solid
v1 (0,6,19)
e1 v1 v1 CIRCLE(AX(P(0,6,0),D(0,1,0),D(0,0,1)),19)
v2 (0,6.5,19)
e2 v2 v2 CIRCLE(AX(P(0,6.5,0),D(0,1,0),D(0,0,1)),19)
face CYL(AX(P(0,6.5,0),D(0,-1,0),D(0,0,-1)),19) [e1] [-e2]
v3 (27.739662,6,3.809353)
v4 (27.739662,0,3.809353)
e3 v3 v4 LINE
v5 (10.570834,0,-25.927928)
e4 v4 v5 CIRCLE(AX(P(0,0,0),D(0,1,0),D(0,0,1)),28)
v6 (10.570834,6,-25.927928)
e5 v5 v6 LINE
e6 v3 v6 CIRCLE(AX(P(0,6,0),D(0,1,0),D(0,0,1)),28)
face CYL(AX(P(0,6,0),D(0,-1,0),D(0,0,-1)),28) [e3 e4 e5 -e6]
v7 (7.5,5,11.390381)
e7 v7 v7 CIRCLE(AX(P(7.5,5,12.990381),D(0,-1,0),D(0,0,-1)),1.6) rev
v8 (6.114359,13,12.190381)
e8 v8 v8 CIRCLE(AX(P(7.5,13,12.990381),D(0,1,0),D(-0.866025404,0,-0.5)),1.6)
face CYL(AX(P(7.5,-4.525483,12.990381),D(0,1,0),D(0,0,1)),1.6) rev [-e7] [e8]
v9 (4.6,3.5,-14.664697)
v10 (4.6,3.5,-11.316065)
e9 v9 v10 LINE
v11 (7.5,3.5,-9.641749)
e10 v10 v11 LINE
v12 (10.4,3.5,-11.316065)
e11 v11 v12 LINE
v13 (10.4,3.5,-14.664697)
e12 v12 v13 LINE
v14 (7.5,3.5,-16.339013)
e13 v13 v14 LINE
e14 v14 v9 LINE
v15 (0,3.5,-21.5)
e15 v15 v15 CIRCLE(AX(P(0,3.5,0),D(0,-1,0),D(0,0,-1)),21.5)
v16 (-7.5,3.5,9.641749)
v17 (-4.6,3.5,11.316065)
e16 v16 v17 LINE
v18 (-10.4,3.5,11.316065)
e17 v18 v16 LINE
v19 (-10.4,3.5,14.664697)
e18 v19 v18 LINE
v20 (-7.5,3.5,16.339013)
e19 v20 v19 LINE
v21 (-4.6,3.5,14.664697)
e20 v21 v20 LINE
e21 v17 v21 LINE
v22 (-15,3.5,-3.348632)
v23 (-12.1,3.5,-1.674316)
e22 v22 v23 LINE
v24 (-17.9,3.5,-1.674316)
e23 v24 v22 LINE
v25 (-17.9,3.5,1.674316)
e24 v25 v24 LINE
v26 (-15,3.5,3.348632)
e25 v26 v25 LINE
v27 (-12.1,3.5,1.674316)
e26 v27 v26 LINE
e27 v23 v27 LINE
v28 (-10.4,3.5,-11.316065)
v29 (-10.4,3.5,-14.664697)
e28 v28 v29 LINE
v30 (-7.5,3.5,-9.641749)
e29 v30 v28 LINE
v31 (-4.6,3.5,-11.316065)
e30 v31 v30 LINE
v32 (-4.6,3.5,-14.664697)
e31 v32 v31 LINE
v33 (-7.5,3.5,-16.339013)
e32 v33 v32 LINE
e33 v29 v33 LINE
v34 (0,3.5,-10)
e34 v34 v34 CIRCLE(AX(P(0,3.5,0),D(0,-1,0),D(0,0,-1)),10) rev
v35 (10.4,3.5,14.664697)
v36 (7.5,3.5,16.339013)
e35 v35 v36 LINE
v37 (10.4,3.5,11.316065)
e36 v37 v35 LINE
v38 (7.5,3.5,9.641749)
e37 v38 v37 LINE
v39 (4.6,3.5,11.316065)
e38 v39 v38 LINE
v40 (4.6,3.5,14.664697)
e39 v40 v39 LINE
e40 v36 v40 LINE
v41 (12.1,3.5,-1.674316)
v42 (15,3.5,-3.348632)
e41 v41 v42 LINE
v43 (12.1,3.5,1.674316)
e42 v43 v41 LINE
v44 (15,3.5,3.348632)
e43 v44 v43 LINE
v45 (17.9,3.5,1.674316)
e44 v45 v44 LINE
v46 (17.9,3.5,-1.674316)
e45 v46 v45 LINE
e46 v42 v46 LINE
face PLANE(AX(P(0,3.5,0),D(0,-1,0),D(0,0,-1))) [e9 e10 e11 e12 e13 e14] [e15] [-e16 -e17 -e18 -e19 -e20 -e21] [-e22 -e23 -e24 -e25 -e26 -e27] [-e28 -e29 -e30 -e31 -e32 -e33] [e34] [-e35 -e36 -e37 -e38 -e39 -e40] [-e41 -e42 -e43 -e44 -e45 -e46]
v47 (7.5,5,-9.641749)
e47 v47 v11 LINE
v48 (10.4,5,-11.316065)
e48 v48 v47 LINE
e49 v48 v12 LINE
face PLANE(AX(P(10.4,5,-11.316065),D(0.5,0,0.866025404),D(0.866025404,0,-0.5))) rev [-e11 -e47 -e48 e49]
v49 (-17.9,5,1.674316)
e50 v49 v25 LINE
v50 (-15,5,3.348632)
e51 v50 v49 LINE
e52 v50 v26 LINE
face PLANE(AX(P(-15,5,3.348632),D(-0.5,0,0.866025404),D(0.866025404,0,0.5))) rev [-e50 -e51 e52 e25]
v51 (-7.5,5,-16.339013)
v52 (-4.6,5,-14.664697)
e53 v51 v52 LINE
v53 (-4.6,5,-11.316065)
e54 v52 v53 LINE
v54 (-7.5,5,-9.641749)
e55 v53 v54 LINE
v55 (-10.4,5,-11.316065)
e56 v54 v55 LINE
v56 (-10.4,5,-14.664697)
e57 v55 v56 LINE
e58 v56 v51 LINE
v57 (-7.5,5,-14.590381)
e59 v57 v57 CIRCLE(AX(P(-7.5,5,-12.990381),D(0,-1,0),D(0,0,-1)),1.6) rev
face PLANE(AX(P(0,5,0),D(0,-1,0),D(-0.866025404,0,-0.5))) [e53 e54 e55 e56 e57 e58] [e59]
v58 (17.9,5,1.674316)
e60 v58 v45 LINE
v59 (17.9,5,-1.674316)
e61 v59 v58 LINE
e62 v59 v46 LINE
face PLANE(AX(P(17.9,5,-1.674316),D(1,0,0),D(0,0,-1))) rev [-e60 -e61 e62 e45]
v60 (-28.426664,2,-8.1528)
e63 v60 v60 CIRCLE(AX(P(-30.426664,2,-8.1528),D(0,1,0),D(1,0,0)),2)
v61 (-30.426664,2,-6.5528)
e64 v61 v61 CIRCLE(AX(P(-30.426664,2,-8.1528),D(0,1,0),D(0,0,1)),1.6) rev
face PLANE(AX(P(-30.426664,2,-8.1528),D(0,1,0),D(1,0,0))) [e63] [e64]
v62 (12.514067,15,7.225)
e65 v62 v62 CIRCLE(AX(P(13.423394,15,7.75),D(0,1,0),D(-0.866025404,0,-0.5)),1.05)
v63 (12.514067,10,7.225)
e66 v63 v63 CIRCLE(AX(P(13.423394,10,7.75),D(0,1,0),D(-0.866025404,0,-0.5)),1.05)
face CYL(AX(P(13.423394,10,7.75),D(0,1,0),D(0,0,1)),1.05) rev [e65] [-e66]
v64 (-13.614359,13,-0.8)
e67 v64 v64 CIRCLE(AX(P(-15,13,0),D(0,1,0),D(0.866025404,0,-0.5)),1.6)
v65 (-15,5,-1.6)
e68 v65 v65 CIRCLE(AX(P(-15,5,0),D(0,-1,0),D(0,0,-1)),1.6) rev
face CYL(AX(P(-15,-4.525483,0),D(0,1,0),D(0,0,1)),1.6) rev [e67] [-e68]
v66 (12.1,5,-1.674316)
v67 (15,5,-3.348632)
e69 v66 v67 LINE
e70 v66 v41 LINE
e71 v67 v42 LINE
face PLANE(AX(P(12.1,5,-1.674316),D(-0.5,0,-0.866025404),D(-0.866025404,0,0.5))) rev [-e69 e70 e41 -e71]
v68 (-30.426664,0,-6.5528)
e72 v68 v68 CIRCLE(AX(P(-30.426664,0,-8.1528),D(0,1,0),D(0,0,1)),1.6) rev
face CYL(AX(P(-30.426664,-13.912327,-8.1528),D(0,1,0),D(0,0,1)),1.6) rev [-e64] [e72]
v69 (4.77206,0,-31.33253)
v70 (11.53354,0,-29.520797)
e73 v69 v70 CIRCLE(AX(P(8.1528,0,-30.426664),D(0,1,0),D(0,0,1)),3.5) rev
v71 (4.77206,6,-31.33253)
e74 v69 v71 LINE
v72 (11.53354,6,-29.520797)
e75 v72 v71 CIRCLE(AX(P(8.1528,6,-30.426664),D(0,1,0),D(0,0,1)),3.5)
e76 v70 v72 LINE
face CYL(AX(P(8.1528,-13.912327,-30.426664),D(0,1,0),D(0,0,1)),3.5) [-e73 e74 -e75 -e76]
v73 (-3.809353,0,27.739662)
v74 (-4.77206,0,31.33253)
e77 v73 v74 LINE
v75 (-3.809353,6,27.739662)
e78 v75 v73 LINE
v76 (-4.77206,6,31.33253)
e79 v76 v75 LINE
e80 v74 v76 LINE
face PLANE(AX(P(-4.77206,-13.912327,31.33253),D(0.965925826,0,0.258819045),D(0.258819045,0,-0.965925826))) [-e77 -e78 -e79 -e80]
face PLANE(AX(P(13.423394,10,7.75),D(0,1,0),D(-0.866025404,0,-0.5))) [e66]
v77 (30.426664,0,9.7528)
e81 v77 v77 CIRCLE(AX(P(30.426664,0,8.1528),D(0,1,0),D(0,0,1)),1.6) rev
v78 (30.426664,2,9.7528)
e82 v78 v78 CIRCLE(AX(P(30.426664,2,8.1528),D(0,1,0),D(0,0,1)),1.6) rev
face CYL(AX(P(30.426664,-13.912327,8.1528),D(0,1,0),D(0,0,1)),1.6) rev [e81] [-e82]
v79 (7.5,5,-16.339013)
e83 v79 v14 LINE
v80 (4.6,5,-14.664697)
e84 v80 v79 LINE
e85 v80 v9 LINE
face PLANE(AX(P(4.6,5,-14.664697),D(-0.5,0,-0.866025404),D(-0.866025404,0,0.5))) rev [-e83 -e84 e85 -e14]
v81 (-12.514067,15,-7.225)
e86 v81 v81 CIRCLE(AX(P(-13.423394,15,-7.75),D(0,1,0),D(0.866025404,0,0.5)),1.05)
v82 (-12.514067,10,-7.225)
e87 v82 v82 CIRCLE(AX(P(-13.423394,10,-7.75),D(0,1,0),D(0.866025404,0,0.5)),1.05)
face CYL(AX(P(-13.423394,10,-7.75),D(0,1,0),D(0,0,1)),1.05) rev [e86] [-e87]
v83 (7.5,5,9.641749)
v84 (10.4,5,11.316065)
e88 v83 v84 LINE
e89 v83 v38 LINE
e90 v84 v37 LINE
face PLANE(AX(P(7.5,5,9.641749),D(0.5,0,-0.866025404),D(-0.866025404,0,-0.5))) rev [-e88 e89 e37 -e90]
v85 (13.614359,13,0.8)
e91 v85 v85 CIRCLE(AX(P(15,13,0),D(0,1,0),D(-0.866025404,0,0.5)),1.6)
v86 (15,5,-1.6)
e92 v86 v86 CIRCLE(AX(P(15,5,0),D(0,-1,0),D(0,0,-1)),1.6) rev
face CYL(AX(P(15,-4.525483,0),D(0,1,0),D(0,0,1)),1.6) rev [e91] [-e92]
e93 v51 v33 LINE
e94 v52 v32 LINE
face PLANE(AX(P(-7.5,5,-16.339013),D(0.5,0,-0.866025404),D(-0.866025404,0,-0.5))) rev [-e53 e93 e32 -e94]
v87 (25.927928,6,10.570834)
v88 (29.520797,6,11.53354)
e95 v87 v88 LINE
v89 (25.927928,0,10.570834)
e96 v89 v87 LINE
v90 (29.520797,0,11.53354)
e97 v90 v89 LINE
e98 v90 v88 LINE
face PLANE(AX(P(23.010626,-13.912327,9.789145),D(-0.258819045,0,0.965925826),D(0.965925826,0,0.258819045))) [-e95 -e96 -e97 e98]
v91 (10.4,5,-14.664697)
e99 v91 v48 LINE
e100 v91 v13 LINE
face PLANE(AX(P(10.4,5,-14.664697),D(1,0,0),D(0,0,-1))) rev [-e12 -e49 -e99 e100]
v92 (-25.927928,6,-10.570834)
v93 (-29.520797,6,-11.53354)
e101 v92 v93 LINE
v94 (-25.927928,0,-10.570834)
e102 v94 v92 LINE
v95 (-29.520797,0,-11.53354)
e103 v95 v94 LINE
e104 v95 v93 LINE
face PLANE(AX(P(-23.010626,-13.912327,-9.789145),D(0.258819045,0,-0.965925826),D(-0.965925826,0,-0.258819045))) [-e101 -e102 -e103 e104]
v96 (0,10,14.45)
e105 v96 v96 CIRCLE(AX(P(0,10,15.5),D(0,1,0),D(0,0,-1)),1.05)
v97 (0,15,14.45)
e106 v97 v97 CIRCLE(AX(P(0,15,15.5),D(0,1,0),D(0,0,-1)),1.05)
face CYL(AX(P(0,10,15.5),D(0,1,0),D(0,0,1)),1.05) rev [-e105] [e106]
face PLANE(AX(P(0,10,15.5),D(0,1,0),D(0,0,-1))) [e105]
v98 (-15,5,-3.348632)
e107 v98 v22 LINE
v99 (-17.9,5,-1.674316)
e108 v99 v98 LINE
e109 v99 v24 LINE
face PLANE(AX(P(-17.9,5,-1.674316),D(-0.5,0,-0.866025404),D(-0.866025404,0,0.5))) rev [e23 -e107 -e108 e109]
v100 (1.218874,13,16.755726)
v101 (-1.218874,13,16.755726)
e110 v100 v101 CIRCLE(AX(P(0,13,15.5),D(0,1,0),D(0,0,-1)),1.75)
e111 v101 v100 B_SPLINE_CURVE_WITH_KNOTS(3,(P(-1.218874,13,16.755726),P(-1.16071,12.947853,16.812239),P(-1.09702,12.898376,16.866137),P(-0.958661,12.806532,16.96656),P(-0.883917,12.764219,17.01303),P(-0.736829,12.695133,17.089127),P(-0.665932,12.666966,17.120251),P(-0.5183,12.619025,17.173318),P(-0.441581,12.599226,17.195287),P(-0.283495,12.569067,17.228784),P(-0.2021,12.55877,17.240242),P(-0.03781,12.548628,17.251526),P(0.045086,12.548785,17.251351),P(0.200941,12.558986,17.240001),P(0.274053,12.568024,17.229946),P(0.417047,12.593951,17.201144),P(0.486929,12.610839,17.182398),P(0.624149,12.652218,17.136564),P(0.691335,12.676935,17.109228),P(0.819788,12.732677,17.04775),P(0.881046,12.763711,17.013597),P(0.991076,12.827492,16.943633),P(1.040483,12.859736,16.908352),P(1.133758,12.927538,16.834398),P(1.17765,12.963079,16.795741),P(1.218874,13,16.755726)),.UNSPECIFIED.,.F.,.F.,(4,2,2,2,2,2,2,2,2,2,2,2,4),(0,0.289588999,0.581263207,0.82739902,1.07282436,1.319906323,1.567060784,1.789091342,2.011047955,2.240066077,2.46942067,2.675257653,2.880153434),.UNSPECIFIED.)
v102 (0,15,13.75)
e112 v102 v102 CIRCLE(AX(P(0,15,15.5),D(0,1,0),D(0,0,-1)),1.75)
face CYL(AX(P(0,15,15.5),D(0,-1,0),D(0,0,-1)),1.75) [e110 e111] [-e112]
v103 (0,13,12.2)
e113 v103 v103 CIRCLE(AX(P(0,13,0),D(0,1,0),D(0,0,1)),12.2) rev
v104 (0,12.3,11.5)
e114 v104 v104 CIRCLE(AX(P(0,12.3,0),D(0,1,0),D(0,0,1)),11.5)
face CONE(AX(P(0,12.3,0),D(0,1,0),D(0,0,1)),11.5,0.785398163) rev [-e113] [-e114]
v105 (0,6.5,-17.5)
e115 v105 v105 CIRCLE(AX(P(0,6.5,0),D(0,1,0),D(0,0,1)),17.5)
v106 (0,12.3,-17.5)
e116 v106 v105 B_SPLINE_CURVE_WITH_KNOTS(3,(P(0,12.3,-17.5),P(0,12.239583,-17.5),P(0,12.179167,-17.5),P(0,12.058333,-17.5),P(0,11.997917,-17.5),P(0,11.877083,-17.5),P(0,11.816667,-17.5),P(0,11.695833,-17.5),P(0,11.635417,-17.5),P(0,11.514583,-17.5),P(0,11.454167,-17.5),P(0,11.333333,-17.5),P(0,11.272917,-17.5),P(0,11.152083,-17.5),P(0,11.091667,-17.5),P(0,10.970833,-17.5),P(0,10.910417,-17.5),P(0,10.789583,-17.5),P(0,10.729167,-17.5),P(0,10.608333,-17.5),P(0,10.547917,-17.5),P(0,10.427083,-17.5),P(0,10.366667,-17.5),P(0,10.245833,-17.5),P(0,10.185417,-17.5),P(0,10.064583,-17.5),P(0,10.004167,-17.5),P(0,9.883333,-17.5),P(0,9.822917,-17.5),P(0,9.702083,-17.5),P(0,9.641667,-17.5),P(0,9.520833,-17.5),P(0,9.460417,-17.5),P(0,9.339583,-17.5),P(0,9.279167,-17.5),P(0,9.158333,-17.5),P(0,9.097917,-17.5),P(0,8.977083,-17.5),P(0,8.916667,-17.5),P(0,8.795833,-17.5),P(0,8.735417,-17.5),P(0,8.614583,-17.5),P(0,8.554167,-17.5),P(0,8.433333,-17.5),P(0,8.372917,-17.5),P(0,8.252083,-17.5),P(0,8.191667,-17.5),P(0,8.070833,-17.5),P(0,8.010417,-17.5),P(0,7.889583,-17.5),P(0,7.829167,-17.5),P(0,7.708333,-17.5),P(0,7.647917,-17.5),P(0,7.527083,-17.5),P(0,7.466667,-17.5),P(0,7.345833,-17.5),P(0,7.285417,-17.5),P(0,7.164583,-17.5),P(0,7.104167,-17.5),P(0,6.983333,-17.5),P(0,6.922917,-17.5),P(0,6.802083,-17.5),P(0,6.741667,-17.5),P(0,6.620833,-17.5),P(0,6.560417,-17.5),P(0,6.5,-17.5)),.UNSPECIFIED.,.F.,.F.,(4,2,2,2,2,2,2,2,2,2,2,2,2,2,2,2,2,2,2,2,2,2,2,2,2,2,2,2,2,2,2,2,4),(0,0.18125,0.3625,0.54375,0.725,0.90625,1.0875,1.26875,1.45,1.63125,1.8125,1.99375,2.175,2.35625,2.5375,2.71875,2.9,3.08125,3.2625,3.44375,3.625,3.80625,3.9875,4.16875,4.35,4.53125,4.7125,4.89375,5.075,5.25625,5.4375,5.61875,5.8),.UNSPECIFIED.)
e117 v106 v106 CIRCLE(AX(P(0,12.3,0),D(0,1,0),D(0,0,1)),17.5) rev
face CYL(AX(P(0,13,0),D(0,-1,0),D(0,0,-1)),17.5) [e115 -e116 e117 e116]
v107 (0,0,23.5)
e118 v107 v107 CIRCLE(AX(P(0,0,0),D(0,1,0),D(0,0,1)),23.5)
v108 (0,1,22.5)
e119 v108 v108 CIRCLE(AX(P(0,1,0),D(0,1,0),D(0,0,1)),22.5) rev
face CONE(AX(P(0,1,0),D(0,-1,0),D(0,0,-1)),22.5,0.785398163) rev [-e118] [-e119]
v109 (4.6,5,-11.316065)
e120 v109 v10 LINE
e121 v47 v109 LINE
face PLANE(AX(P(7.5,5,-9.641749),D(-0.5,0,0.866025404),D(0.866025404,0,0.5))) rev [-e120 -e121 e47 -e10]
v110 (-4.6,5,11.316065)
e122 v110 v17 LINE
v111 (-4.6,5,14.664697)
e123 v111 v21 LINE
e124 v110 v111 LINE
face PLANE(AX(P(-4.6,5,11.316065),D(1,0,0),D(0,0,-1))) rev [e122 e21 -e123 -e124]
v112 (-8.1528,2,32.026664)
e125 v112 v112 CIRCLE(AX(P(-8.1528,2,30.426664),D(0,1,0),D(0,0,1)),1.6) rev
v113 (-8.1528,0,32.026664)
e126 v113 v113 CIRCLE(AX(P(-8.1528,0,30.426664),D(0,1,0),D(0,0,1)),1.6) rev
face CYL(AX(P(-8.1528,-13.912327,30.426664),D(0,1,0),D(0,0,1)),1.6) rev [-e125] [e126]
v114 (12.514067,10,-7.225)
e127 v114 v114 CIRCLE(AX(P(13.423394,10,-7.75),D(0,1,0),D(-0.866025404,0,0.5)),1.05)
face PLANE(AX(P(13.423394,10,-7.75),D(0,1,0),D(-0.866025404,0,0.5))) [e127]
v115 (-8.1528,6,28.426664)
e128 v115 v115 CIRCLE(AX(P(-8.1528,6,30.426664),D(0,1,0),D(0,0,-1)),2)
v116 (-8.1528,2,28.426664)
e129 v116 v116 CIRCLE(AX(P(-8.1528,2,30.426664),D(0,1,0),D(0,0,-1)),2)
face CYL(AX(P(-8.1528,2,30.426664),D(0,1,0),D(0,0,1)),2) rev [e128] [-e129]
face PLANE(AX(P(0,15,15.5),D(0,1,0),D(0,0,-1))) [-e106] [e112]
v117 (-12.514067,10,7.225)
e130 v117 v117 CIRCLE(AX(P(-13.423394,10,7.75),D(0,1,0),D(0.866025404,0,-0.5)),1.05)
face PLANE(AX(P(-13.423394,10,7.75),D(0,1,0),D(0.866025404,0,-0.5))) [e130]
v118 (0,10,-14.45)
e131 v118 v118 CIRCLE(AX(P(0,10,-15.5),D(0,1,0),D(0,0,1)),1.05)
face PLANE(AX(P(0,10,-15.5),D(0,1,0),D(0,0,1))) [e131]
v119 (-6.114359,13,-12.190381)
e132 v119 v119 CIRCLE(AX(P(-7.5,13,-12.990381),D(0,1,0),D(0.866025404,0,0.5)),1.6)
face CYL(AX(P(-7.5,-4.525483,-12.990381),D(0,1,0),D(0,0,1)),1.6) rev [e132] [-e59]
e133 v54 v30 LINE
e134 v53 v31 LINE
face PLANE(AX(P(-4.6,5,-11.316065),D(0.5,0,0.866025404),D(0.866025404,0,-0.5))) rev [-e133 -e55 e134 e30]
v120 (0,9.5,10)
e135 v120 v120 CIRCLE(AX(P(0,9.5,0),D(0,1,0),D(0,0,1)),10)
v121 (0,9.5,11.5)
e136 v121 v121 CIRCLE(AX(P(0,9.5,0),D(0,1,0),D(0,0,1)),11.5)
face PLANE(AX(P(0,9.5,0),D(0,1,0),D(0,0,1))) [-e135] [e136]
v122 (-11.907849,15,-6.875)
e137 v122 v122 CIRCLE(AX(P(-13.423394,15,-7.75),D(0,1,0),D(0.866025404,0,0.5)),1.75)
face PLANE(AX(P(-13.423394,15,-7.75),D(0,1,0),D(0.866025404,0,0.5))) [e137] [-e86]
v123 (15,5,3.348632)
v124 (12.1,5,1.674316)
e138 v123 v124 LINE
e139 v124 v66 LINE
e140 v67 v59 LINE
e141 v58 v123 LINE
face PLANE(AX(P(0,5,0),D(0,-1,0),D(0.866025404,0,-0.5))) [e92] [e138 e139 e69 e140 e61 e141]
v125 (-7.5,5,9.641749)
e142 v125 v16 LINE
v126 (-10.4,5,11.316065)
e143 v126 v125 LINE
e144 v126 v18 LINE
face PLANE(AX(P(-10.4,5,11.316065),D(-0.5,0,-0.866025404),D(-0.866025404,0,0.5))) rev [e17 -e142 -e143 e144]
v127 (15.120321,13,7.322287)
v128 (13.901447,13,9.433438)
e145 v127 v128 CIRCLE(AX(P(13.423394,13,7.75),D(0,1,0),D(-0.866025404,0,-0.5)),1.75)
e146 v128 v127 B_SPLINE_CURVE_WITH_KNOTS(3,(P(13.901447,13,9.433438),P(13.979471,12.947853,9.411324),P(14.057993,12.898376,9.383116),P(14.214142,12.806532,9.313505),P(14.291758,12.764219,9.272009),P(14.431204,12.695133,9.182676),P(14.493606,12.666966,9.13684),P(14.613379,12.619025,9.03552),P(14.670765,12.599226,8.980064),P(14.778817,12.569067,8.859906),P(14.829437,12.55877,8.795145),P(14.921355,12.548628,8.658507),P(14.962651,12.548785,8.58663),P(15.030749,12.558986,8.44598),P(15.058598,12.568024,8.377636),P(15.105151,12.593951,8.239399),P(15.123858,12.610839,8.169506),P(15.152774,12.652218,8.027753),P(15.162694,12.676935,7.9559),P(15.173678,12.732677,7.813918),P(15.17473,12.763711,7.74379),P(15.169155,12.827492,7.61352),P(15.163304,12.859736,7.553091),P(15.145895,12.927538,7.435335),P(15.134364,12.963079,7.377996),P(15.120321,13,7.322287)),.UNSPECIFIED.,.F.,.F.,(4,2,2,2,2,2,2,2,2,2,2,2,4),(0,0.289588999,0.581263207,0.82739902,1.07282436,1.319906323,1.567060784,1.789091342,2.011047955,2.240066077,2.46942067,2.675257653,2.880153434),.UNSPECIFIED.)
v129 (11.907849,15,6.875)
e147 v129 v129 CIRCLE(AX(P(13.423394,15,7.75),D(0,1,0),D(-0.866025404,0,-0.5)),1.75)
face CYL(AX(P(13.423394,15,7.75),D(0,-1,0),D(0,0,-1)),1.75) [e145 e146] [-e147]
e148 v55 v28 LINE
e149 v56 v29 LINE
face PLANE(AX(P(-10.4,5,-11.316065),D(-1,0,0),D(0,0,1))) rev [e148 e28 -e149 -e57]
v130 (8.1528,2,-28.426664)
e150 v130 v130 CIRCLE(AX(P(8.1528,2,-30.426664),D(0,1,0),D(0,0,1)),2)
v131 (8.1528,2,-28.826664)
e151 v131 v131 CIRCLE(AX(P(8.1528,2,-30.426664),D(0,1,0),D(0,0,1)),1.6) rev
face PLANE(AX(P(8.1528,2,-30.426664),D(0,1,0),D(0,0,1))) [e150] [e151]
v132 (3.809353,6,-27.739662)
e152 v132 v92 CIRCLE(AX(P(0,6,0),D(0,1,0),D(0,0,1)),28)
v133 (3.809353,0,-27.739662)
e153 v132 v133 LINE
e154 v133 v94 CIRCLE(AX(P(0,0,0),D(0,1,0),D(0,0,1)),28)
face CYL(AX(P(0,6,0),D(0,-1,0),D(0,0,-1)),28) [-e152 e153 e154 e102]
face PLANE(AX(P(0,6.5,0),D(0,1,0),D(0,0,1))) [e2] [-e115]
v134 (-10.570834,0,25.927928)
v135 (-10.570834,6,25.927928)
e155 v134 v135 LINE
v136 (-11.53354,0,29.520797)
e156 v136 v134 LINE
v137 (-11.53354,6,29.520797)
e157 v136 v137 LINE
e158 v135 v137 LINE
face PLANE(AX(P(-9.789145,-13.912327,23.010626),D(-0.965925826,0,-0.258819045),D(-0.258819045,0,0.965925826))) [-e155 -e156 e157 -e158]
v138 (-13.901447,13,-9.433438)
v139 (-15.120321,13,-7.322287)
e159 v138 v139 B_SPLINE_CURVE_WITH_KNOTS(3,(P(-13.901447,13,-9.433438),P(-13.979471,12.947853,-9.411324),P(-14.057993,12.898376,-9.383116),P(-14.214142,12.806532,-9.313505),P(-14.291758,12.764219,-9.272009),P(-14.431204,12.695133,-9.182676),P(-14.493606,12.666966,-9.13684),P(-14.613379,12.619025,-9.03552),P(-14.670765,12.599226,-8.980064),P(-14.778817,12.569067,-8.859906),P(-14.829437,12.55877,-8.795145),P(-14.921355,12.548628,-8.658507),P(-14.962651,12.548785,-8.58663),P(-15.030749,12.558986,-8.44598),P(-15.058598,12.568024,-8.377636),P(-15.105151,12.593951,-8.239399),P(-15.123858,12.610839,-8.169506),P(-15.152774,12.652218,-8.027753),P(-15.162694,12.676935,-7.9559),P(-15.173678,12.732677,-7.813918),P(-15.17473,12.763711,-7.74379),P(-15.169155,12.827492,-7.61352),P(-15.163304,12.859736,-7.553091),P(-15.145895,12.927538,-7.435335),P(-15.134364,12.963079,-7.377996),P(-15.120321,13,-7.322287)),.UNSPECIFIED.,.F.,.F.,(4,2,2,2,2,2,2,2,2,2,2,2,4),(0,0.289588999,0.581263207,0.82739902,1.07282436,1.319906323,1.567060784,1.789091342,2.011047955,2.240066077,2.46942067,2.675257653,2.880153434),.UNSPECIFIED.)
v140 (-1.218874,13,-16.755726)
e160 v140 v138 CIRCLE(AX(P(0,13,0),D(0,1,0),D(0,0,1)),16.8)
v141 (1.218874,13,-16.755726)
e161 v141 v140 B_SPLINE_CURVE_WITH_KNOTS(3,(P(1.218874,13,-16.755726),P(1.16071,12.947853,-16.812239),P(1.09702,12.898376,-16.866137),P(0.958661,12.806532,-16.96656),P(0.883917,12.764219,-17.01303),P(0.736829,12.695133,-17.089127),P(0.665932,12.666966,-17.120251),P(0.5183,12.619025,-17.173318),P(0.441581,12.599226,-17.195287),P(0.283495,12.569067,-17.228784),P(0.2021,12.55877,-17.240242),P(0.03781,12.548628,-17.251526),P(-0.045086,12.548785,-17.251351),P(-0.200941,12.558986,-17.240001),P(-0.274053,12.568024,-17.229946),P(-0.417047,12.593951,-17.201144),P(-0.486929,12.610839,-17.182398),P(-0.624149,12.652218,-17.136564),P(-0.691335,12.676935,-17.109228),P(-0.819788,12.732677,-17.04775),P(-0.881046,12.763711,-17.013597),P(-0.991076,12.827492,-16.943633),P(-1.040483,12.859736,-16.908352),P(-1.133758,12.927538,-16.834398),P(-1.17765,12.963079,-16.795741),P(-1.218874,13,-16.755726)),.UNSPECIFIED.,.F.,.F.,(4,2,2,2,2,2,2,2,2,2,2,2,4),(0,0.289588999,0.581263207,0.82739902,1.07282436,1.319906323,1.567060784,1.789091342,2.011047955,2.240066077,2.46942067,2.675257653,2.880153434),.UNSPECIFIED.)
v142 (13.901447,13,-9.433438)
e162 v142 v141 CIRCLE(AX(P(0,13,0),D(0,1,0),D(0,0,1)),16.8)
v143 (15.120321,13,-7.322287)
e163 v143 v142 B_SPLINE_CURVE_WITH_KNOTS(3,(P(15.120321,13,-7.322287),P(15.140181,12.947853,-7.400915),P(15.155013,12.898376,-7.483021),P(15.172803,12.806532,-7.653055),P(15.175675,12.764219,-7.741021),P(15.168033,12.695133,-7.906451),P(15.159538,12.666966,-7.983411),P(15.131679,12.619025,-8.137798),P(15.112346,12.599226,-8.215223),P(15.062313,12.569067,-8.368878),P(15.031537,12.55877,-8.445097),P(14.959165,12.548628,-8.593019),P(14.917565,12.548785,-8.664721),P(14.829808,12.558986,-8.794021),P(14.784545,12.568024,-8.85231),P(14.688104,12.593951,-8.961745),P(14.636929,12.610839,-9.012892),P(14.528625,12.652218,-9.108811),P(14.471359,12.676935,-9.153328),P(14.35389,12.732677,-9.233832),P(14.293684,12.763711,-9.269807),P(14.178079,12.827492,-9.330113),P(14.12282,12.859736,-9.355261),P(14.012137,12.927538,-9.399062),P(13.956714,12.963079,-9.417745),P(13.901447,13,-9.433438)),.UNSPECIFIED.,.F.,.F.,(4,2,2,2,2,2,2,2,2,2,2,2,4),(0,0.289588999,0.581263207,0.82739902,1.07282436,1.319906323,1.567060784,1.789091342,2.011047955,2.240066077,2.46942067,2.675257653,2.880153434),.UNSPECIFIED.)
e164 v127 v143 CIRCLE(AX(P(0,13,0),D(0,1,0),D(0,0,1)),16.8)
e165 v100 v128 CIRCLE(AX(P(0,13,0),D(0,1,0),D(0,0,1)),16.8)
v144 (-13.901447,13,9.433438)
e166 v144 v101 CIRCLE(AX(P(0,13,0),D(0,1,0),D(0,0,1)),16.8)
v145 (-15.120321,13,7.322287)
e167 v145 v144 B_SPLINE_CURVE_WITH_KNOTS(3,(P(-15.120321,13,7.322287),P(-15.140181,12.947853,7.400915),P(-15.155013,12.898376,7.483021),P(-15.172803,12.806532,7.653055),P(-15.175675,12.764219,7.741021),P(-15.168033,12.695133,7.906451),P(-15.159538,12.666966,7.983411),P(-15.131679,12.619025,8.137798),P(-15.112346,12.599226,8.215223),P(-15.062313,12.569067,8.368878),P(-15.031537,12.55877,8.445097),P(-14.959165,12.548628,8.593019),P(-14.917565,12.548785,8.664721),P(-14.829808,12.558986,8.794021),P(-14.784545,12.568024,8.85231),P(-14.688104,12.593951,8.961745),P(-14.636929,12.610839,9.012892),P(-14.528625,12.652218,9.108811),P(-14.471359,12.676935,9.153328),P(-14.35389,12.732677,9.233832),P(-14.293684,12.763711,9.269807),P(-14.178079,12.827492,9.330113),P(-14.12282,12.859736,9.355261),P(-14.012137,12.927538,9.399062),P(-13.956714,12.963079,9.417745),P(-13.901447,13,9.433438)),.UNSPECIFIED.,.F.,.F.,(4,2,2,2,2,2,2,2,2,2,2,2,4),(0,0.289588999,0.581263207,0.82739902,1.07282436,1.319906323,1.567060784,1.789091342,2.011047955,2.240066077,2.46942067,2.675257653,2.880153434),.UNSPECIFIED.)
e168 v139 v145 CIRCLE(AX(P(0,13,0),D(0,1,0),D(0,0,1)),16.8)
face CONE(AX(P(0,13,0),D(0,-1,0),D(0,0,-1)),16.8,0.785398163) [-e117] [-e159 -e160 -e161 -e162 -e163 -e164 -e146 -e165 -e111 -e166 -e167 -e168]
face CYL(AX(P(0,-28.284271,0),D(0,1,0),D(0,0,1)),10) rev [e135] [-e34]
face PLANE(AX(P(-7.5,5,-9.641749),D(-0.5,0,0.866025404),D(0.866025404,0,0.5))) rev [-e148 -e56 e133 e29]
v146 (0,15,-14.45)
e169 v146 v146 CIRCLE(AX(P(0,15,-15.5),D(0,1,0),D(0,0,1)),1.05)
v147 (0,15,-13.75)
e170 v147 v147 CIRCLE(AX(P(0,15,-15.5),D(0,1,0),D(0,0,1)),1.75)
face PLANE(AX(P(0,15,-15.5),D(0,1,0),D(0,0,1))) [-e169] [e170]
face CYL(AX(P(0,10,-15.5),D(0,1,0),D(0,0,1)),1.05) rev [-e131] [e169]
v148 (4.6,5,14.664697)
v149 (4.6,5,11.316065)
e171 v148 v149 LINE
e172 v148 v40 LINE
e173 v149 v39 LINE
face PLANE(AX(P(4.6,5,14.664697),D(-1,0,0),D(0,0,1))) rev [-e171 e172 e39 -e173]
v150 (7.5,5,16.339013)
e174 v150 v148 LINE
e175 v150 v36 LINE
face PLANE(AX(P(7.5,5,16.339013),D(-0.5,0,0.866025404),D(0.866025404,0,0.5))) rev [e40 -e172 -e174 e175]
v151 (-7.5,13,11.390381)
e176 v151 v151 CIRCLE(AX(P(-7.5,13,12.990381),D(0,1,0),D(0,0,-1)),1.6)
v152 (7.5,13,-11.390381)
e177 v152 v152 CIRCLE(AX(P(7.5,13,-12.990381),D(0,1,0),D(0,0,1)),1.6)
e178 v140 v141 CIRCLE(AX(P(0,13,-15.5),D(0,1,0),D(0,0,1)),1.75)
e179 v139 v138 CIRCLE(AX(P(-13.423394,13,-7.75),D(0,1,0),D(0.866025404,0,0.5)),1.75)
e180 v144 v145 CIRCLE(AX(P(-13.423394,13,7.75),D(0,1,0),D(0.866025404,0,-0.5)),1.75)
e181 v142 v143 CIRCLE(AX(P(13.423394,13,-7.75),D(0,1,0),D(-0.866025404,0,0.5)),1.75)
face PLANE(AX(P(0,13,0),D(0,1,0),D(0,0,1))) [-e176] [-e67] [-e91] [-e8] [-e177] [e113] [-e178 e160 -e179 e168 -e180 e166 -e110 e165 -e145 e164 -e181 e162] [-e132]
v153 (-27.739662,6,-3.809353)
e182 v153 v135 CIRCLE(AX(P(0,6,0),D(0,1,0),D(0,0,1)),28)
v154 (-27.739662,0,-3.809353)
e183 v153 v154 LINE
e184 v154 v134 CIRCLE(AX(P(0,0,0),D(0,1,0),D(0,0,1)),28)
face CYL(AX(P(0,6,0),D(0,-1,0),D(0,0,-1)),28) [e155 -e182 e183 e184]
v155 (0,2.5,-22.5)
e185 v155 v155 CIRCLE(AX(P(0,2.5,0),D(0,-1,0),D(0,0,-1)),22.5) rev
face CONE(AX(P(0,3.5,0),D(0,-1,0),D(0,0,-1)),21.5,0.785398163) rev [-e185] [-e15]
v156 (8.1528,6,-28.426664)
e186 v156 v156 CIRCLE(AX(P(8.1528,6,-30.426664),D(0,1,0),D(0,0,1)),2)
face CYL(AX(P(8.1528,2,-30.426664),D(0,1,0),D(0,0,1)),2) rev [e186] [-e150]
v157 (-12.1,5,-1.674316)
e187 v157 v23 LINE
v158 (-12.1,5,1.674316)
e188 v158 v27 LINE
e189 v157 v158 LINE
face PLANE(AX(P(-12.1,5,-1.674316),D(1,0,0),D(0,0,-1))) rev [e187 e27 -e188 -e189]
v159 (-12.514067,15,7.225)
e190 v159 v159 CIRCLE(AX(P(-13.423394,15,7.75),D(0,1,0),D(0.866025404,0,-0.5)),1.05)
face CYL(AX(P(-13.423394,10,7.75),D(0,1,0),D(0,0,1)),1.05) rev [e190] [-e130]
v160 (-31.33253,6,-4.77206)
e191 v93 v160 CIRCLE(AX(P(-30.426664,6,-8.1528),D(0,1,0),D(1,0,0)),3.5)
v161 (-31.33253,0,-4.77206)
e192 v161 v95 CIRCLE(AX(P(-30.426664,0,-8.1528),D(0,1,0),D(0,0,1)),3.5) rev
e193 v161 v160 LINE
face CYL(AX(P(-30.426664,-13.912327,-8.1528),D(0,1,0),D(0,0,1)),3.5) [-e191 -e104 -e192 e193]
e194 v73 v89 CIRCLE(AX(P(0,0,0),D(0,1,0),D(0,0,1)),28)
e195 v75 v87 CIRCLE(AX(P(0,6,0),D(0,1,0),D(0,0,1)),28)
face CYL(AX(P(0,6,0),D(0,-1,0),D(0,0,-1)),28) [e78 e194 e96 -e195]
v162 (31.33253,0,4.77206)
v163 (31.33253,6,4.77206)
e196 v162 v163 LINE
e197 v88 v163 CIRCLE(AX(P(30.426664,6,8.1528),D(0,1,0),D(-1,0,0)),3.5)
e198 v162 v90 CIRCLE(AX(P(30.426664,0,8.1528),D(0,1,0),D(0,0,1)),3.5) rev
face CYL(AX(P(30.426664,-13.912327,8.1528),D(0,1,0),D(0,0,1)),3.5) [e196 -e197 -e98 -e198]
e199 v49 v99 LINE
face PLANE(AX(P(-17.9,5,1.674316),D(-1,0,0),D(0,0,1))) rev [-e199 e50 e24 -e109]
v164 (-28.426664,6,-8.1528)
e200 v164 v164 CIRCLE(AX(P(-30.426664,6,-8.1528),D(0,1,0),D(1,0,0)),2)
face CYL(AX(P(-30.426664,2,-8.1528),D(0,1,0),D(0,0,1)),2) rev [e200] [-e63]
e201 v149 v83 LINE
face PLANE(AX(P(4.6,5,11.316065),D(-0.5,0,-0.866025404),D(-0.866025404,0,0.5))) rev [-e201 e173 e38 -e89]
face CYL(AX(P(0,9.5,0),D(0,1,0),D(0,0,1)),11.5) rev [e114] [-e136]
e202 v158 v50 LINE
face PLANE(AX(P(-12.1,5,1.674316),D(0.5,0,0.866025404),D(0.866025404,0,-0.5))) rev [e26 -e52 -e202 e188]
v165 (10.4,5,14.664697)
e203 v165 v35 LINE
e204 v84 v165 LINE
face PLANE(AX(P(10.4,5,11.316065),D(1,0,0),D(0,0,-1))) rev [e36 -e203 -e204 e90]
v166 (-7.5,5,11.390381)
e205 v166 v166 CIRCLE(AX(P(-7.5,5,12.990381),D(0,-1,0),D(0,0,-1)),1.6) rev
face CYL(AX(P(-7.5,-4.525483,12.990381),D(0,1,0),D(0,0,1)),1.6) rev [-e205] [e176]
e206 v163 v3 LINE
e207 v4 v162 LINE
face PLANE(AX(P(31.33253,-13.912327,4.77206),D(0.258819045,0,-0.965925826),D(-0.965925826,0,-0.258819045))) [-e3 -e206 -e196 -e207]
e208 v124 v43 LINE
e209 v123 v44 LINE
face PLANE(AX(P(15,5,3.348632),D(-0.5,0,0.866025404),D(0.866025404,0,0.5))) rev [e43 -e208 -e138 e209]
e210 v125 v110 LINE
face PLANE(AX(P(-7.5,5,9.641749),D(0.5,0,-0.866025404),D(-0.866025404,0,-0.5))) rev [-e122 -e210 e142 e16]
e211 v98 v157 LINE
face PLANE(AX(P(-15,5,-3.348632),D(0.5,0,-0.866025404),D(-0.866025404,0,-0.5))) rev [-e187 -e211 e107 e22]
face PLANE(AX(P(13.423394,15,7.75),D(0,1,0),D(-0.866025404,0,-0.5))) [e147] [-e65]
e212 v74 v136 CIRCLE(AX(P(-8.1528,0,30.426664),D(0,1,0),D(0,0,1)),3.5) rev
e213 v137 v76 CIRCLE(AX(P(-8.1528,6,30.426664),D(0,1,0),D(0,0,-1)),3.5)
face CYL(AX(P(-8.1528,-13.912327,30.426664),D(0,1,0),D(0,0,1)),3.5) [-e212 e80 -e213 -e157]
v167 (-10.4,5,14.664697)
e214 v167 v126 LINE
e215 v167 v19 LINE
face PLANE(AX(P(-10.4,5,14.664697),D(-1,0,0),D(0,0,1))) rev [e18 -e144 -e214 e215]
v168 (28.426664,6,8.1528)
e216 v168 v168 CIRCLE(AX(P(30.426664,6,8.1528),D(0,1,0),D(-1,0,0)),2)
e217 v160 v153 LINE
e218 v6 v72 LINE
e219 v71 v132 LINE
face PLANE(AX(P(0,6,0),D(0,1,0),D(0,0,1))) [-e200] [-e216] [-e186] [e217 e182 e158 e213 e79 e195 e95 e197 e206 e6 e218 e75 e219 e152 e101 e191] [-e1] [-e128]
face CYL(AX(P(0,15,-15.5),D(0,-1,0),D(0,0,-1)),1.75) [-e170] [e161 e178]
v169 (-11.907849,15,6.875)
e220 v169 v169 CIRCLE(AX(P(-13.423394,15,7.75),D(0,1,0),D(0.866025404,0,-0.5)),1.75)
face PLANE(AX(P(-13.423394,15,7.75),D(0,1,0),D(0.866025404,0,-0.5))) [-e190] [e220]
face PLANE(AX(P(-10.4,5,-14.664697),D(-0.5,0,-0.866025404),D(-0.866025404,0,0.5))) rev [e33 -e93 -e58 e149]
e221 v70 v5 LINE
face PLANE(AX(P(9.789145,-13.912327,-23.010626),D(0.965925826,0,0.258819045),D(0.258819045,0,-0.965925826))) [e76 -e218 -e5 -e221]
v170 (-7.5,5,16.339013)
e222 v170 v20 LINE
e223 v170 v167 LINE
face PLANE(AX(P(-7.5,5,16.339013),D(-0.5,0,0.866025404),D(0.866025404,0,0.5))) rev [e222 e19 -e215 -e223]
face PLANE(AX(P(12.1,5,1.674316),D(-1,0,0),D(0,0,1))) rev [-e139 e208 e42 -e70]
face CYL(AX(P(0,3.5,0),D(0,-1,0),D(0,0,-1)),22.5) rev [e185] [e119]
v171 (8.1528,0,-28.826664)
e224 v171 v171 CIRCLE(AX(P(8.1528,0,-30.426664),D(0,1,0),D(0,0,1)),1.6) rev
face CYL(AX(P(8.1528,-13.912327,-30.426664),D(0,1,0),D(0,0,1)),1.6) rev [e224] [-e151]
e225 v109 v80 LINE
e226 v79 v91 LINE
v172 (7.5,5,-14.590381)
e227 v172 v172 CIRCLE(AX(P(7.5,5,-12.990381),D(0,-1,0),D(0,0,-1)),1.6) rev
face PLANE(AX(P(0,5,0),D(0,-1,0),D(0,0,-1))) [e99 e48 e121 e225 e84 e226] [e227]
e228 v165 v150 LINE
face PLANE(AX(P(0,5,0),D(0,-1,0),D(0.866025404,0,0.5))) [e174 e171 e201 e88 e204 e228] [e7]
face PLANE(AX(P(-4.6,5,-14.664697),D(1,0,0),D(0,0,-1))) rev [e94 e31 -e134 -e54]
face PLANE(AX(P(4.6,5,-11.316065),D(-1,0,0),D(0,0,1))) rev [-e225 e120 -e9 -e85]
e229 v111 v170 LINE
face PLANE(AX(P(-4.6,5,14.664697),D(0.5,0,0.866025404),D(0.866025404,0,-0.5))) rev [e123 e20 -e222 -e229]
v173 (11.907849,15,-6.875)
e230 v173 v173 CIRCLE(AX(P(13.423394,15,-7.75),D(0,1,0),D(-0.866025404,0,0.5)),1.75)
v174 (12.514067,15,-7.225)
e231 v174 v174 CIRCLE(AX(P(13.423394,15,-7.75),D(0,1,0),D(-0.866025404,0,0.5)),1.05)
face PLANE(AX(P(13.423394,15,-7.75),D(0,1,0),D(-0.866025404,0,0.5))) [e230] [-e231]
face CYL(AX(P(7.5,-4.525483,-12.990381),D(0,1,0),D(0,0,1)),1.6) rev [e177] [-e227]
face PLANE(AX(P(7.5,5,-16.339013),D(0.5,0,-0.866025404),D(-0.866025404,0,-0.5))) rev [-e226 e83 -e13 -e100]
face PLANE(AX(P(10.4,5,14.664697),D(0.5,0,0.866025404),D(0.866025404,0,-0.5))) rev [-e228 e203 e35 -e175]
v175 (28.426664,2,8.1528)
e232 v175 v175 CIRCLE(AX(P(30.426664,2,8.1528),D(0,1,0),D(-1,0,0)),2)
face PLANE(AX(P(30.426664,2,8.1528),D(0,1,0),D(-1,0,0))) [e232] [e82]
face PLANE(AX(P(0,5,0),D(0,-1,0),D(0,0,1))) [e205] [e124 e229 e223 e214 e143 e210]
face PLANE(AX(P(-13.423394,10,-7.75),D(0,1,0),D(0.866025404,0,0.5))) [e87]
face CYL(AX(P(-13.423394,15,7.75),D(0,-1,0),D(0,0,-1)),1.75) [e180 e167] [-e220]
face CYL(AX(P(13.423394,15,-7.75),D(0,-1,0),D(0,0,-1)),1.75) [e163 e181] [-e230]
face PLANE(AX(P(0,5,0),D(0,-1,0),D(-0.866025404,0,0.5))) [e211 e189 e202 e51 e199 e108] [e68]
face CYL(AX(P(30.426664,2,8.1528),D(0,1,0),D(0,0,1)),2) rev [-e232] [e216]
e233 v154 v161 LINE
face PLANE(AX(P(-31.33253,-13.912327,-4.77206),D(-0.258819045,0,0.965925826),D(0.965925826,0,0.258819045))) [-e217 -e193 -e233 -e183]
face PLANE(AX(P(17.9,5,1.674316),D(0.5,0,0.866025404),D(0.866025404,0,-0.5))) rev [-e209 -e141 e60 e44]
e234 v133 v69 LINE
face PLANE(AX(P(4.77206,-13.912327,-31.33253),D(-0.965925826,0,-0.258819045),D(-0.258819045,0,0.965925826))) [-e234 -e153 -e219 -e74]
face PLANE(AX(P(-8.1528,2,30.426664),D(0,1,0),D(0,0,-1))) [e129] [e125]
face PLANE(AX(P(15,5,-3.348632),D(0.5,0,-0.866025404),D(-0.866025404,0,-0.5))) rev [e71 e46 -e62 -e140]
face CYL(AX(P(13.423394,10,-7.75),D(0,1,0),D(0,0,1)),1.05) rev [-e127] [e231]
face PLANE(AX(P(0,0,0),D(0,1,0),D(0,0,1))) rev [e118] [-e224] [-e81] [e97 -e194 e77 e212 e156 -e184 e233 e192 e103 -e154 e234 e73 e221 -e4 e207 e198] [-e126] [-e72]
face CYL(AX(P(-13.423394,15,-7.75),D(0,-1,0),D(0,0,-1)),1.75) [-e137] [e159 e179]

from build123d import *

# Parameters (mm, degrees)
SKETCH1_R           = 28
BOSS_EXTRUDE1_DEPTH = 6
SKETCH2_R           = 19
BOSS_EXTRUDE2_DEPTH = 0.5
SKETCH3_R           = 17.5
BOSS_EXTRUDE3_DEPTH = 6.5
SKETCH4_R           = 1.05
CUT_EXTRUDE1_DEPTH  = 3
CIRPATTERN1_COUNT   = 6
SKETCH5_R           = 11.5
CUT_EXTRUDE2_DEPTH  = 3.5
SKETCH6_R           = 10
CUT_EXTRUDE3_DEPTH  = 9.5
SKETCH7_R           = 1.6
CUT_EXTRUDE4_DEPTH  = 13
CUT_EXTRUDE10_DEPTH = 5
CHAMFER1_SIZE       = 1
SKETCH13_R          = 1.6
BOSS_EXTRUDE4_DEPTH = 6
SKETCH14_R          = 2
CUT_EXTRUDE12_DEPTH = 4
CIRPATTERN3_COUNT   = 4
SKETCH15_R          = 22.5
CUT_EXTRUDE13_DEPTH = 3.5
BOSS_EXTRUDE5_START = 2
SKETCH16_R          = 1.75
SKETCH16_R_2        = 1.05
BOSS_EXTRUDE5_DEPTH = 2
CIRPATTERN4_COUNT   = 6
CHAMFER2_SIZE       = 0.7
CHAMFER3_SIZE       = 0.7
CHAMFER4_SIZE       = 1
CIRPATTERN5_COUNT   = 6


with BuildPart() as part:
    # Sketch1 → Boss-Extrude1 (new body)
    with BuildSketch(Plane(origin=(0, 0, 0), x_dir=(1, 0, 0), z_dir=(0, 1, 0))):
        with Locations(Location((0, 0, 0), (0, 0, 270))):
            Circle(SKETCH1_R)
    extrude(amount=BOSS_EXTRUDE1_DEPTH)

    # Sketch2 → Boss-Extrude2 (add)
    with BuildSketch(Plane(origin=(0, 6, 0), x_dir=(1, 0, 0), z_dir=(0, 1, 0))):
        with Locations(Location((0, 0, 0), (0, 0, 270))):
            Circle(SKETCH2_R)
    extrude(amount=BOSS_EXTRUDE2_DEPTH)

    # Sketch3 → Boss-Extrude3 (add)
    with BuildSketch(Plane(origin=(0, 6.5, 0), x_dir=(1, 0, 0), z_dir=(0, 1, 0))):
        with Locations(Location((0, 0, 0), (0, 0, 90))):
            Circle(SKETCH3_R)
    extrude(amount=BOSS_EXTRUDE3_DEPTH)

    # Sketch4 → Cut-Extrude1 (cut)
    with BuildSketch(Plane(origin=(0, 13, 0), x_dir=(1, 0, 0), z_dir=(0, 1, 0))):
        with Locations(Location((0, 15.5, 0), (0, 0, 270))):
            Circle(SKETCH4_R)
    cut_extrude1 = extrude(amount=-CUT_EXTRUDE1_DEPTH, mode=Mode.SUBTRACT)

    # CirPattern1: Cut-Extrude1 ×6 about axis
    cirpattern1_axis = Axis((0, 0, 0), (0, 1, 0))
    for i in range(1, CIRPATTERN1_COUNT):
        add(cut_extrude1.rotate(cirpattern1_axis, i * 360 / CIRPATTERN1_COUNT), mode=Mode.SUBTRACT)

    # Sketch5 → Cut-Extrude2 (cut)
    with BuildSketch(Plane(origin=(0, 13, 0), x_dir=(1, 0, 0), z_dir=(0, 1, 0))):
        with Locations(Location((0, 0, 0), (0, 0, 270))):
            Circle(SKETCH5_R)
    extrude(amount=-CUT_EXTRUDE2_DEPTH, mode=Mode.SUBTRACT)

    # Sketch6 → Cut-Extrude3 (cut)
    with BuildSketch(Plane(origin=(0, 9.5, 0), x_dir=(1, 0, 0), z_dir=(0, 1, 0))):
        with Locations(Location((0, 0, 0), (0, 0, 270))):
            Circle(SKETCH6_R)
    extrude(amount=-CUT_EXTRUDE3_DEPTH, mode=Mode.SUBTRACT)

    # Sketch7 → Cut-Extrude4 (cut)
    with BuildSketch(Plane(origin=(0, 13, 0), x_dir=(1, 0, 0), z_dir=(0, 1, 0))):
        with Locations(Location((7.5, 12.990381057, 0), (0, 0, 270))):
            Circle(SKETCH7_R)
    cut_extrude4 = extrude(amount=-CUT_EXTRUDE4_DEPTH, mode=Mode.SUBTRACT)

    # Sketch9 → Cut-Extrude10 (cut)
    with BuildSketch(Plane.XZ):
        Polygon((7.5, -9.641749495), (4.6, -11.316065276), (4.6, -14.664696837), (7.5, -16.339012618), (10.4, -14.664696837), (10.4, -11.316065276), align=None)
    cut_extrude10 = extrude(amount=-CUT_EXTRUDE10_DEPTH, mode=Mode.SUBTRACT)

    # Chamfer1
    chamfer1_edges = [part.edges().sort_by_distance(p)[0] for p in [
        (0, 0, -10),
    ]]
    chamfer(chamfer1_edges, length=CHAMFER1_SIZE)

    # Sketch13 → Boss-Extrude4 (add)
    with BuildSketch(Plane(origin=(0, 6, 0), x_dir=(1, 0, 0), z_dir=(0, 1, 0))):
        with BuildLine():
            Line((4.772059529, 31.332530186), (3.027664457, 24.822359149))
            Line((3.027664457, 24.822359149), (9.789145241, 23.010625833))
            Line((9.789145241, 23.010625833), (11.533540313, 29.52079687))
            ThreePointArc((11.533540313, 29.52079687), (9.058666579, 33.80740392), (4.772059529, 31.332530186))
        make_face()
        with Locations(Location((8.152799921, 30.426663528, 0), (0, 0, 270))):
            Circle(SKETCH13_R, mode=Mode.SUBTRACT)
    boss_extrude4 = extrude(amount=-BOSS_EXTRUDE4_DEPTH)

    # Sketch14 → Cut-Extrude12 (cut)
    with BuildSketch(Plane(origin=(0, 6, 0), x_dir=(1, 0, 0), z_dir=(0, 1, 0))):
        with Locations(Location((8.152799921, 30.426663528, 0), (0, 0, 270))):
            Circle(SKETCH14_R)
    cut_extrude12 = extrude(amount=-CUT_EXTRUDE12_DEPTH, mode=Mode.SUBTRACT)

    # CirPattern3: Boss-Extrude4, Cut-Extrude12 ×4 about axis
    cirpattern3_axis = Axis((0, 0, 0), (0, 1, 0))
    add([boss_extrude4.rotate(cirpattern3_axis, i * 360 / CIRPATTERN3_COUNT) for i in range(1, CIRPATTERN3_COUNT)])
    add([cut_extrude12.rotate(cirpattern3_axis, i * 360 / CIRPATTERN3_COUNT) for i in range(1, CIRPATTERN3_COUNT)], mode=Mode.SUBTRACT)

    # Sketch15 → Cut-Extrude13 (cut)
    with BuildSketch(Plane.XZ):
        with Locations(Location((0, 0, 0), (0, 0, 270))):
            Circle(SKETCH15_R)
    extrude(amount=-CUT_EXTRUDE13_DEPTH, mode=Mode.SUBTRACT)

    # Sketch16 → Boss-Extrude5 (add)
    with BuildSketch(Plane(origin=(0, 13, 0), x_dir=(1, 0, 0), z_dir=(0, 1, 0)).offset(BOSS_EXTRUDE5_START)):
        with Locations(Location((0, 15.5, 0), (0, 0, 270))):
            Circle(SKETCH16_R)
        with Locations(Location((0, 15.5, 0), (0, 0, 270))):
            Circle(SKETCH16_R_2, mode=Mode.SUBTRACT)
    boss_extrude5 = extrude(amount=-BOSS_EXTRUDE5_DEPTH)

    # CirPattern4: Boss-Extrude5 ×6 about axis
    cirpattern4_axis = Axis((0, 0, 0), (0, 1, 0))
    for i in range(1, CIRPATTERN4_COUNT):
        add(boss_extrude5.rotate(cirpattern4_axis, i * 360 / CIRPATTERN4_COUNT))

    # Chamfer2
    # the kernel refuses this chamfer: 0.7 mm, written as the material it takes off along each edge
    with BuildSketch(Plane(origin=(0, 13, 0), x_dir=(0, 0, -1), z_dir=(1, 0, 0))) as chamfer2_piece_1_section:
        Polygon((17.5, -CHAMFER2_SIZE), (17.5 - CHAMFER2_SIZE, 0), (17.5, 0), align=None)
    chamfer2_piece_1 = revolve(axis=Axis((0, 13, 0), (0, 1, 0)), mode=Mode.PRIVATE)
    chamfer2_piece_1 = chamfer2_piece_1 - Plane(origin=(-13.423393759, 12.425021075, 7.75), x_dir=(0.8660254037844388, 0, -0.4999999999999996), z_dir=(0, 1, 0)) * Cylinder(1.75, 71, mode=Mode.PRIVATE)
    chamfer2_piece_1 = chamfer2_piece_1 - Plane(origin=(0, 12.425021075, 15.5), x_dir=(0, 0, -1), z_dir=(0, 1, 0)) * Cylinder(1.75, 71, mode=Mode.PRIVATE)
    chamfer2_piece_1 = chamfer2_piece_1 - Plane(origin=(13.423393759, 12.425021075, 7.75), x_dir=(-0.8660254037844384, 0, -0.5000000000000007), z_dir=(0, 1, 0)) * Cylinder(1.75, 71, mode=Mode.PRIVATE)
    chamfer2_piece_1 = chamfer2_piece_1 - Plane(origin=(-13.423393759, 12.425021075, -7.75), x_dir=(0.8660254037844386, 0, 0.5000000000000003), z_dir=(0, 1, 0)) * Cylinder(1.75, 71, mode=Mode.PRIVATE)
    chamfer2_piece_1 = chamfer2_piece_1 - Plane(origin=(0, 12.425021075, -15.5), x_dir=(0, 0, 1), z_dir=(0, 1, 0)) * Cylinder(1.75, 71, mode=Mode.PRIVATE)
    chamfer2_piece_1 = chamfer2_piece_1 - Plane(origin=(13.423393759, 12.425021075, -7.75), x_dir=(-0.8660254037844387, 0, 0.49999999999999994), z_dir=(0, 1, 0)) * Cylinder(1.75, 71, mode=Mode.PRIVATE)
    add(chamfer2_piece_1, mode=Mode.SUBTRACT)

    # Chamfer3
    chamfer3_edges = [part.edges().sort_by_distance(p)[0] for p in [
        (0, 13, -11.5),
    ]]
    chamfer(chamfer3_edges, length=CHAMFER3_SIZE)

    # Chamfer4
    chamfer4_edges = [part.edges().sort_by_distance(p)[0] for p in [
        (0, 0, 22.5),
        (0, 3.5, 22.5),
    ]]
    chamfer(chamfer4_edges, length=CHAMFER4_SIZE)

    # CirPattern5: Cut-Extrude4, Cut-Extrude10 ×6 about axis
    cirpattern5_axis = Axis((0, 0, 0), (0, 1, 0))
    add([cut_extrude4.rotate(cirpattern5_axis, i * 360 / CIRPATTERN5_COUNT) for i in range(1, CIRPATTERN5_COUNT)], mode=Mode.SUBTRACT)
    add([cut_extrude10.rotate(cirpattern5_axis, i * 360 / CIRPATTERN5_COUNT) for i in range(1, CIRPATTERN5_COUNT)], mode=Mode.SUBTRACT)


solid = part.part
